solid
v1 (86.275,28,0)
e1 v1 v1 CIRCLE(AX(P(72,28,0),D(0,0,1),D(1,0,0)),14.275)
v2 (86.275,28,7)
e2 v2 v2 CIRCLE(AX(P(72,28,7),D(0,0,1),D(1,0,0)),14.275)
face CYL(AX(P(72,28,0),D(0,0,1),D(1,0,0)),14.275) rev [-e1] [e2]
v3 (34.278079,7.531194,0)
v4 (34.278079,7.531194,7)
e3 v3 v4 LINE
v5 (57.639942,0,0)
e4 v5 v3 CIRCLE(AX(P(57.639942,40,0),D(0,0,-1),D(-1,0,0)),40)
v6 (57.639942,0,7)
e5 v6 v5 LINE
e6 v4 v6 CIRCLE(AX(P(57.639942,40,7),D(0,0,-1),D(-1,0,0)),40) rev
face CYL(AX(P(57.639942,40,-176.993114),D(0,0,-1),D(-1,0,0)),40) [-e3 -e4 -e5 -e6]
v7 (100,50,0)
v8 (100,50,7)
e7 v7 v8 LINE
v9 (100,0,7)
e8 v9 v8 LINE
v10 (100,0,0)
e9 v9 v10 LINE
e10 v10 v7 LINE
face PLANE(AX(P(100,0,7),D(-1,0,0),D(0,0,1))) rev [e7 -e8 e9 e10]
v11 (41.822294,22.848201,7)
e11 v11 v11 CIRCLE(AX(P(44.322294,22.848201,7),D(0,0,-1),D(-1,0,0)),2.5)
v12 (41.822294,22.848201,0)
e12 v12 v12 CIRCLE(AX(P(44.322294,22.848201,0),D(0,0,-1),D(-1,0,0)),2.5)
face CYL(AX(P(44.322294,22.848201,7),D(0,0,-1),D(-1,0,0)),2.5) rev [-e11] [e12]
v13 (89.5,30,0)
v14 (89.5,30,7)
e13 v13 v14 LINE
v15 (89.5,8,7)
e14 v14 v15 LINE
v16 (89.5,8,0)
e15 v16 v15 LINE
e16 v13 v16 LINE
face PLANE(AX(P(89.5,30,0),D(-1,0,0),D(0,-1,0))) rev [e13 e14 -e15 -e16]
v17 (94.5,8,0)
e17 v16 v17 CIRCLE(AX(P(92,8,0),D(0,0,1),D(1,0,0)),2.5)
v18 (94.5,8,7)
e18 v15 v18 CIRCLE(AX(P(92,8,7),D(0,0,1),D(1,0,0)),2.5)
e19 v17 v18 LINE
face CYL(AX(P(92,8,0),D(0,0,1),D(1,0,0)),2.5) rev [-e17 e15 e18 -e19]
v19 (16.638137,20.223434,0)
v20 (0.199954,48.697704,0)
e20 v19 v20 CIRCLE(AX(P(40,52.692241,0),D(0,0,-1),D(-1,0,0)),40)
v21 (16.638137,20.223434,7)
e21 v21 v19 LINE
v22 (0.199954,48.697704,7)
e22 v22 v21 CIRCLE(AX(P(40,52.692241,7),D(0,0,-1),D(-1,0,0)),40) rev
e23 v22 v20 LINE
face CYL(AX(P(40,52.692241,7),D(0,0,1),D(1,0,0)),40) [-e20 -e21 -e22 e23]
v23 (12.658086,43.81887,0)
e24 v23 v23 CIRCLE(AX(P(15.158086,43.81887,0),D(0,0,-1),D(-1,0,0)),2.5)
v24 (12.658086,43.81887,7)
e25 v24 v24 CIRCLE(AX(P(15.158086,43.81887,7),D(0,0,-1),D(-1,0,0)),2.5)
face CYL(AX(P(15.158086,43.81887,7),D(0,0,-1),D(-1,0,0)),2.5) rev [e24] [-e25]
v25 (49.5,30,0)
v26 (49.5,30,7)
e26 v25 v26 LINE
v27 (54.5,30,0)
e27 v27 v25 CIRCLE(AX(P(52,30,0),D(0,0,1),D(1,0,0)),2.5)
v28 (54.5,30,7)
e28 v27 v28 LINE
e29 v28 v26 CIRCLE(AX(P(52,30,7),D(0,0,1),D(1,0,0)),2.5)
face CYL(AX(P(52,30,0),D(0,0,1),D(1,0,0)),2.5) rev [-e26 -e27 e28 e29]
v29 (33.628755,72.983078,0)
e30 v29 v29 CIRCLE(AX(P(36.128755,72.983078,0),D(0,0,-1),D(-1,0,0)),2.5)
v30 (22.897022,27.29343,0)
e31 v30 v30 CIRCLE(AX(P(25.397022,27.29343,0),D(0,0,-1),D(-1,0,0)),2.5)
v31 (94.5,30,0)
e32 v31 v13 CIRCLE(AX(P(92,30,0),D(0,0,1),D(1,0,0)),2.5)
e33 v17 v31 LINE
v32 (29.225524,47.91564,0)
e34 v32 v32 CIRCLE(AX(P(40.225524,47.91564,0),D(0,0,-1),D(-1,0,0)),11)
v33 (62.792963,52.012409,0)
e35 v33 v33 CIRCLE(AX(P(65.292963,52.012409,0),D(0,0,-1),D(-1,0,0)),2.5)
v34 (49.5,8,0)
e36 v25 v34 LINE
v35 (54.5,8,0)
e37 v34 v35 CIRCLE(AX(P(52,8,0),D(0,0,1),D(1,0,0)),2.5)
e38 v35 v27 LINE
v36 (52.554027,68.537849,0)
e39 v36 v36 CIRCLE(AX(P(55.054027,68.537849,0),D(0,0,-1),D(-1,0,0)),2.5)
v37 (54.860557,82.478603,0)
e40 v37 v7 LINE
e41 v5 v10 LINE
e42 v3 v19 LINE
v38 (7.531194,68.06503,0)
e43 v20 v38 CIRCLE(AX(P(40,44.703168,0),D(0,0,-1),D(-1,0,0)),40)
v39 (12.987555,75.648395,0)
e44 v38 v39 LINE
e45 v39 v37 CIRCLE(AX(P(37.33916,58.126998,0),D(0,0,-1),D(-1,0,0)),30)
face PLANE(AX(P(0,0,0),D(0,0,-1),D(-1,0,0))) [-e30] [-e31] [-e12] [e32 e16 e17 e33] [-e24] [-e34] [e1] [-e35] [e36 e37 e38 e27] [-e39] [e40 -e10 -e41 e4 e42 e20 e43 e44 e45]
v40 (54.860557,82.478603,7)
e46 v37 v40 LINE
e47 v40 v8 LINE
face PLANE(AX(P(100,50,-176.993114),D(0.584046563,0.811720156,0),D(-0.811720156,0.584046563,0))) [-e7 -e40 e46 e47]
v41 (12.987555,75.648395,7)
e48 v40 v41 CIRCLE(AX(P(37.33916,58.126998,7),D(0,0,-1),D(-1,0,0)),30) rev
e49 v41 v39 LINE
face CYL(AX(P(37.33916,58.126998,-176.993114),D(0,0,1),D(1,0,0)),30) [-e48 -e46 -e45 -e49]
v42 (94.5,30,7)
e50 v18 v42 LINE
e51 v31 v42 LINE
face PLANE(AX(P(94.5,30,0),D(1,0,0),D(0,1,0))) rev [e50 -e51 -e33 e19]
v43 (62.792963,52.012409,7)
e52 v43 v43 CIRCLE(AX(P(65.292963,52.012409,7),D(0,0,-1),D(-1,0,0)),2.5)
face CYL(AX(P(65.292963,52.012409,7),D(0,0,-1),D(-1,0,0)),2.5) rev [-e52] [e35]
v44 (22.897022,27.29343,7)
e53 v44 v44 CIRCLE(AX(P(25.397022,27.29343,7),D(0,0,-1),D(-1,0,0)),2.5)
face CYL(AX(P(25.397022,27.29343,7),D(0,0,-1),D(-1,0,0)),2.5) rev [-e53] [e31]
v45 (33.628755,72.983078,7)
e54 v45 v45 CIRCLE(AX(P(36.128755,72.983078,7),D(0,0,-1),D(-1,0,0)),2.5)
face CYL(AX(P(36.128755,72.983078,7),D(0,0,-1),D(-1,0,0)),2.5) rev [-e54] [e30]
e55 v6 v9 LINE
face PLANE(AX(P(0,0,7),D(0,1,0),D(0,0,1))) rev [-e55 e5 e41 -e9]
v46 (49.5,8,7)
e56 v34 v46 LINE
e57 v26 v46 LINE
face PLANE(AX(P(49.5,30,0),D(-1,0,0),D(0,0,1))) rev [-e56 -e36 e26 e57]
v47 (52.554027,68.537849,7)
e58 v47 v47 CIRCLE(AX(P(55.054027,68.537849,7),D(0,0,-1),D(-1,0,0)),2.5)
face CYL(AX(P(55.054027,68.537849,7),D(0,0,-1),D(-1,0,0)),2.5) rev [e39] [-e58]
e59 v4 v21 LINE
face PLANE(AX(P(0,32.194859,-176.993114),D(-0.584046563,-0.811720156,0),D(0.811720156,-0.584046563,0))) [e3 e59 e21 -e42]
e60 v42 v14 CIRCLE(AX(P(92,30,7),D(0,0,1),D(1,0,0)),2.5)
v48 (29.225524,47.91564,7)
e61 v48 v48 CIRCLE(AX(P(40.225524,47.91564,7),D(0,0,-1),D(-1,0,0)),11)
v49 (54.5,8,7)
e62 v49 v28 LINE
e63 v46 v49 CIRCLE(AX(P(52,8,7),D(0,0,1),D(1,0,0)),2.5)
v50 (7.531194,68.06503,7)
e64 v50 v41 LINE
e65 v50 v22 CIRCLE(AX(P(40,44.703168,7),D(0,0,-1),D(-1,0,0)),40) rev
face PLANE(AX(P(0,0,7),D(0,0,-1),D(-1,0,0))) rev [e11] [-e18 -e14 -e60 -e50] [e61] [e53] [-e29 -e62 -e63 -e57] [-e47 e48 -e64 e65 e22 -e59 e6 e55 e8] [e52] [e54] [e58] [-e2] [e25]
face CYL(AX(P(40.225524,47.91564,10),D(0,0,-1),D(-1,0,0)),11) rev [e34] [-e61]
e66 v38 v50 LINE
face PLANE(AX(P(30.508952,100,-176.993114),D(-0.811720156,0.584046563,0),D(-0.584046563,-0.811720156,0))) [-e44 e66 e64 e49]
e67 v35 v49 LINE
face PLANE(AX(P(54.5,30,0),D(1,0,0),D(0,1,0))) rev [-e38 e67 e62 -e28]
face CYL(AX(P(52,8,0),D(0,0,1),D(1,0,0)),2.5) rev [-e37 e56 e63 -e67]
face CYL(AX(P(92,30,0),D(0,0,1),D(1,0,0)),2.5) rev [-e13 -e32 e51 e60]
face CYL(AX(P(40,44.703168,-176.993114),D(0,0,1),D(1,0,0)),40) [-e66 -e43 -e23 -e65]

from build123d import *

# Parameters (mm, degrees)
SKETCH1_W               = 100
SKETCH1_H               = 100
BOSS_EXTRUDE1_DEPTH     = 7
SKETCH2_R               = 14.275
CUT_EXTRUDE1_DEPTH      = 142.594491418
SKETCH3_R               = 11
CUT_EXTRUDE2_DEPTH      = 10
SKETCH6_R               = 2.5
CUT_EXTRUDE3_DEPTH      = 142.594491418
CUT_EXTRUDE4_DEPTH      = 142.594491418
CUT_EXTRUDE4_DEPTH_BACK = 142.594491418
FILLET1_R               = 30
FILLET2_R               = 40


with BuildPart() as part:
    # Sketch1 → Boss-Extrude1 (new body)
    with BuildSketch(Plane.XY):
        with Locations((50, 50)):
            Rectangle(SKETCH1_W, SKETCH1_H)
    extrude(amount=BOSS_EXTRUDE1_DEPTH)

    # Sketch2 → Cut-Extrude1 (cut, through all)
    with BuildSketch(Plane.XY.offset(7)):
        with Locations((72, 28)):
            Circle(SKETCH2_R)
        with BuildLine():
            Line((54.5, 30), (54.5, 8))
            ThreePointArc((54.5, 8), (52, 5.5), (49.5, 8))
            Line((49.5, 8), (49.5, 30))
            ThreePointArc((49.5, 30), (52, 32.5), (54.5, 30))
        make_face()
        with BuildLine():
            Line((94.5, 30), (94.5, 8))
            ThreePointArc((94.5, 8), (92, 5.5), (89.5, 8))
            Line((89.5, 8), (89.5, 30))
            ThreePointArc((89.5, 30), (92, 32.5), (94.5, 30))
        make_face()
    extrude(amount=-CUT_EXTRUDE1_DEPTH, mode=Mode.SUBTRACT)

    # Sketch3 → Cut-Extrude2 (cut)
    with BuildSketch(Plane(origin=(0, 0, 0), x_dir=(-1, 0, 0), z_dir=(0, 0, -1))):
        with Locations((-40.225524413, 47.915639612)):
            Circle(SKETCH3_R)
    extrude(amount=-CUT_EXTRUDE2_DEPTH, mode=Mode.SUBTRACT)

    # Sketch6 → Cut-Extrude3 (cut, through all)
    with BuildSketch(Plane(origin=(0, 0, 0), x_dir=(-1, 0, 0), z_dir=(0, 0, -1))):
        with Locations((-15.158085821, 43.818869855)):
            Circle(SKETCH6_R)
        with Locations((-36.128754655, 72.983078204)):
            Circle(SKETCH6_R)
        with Locations((-25.397022274, 27.293430121)):
            Circle(SKETCH6_R)
        with Locations((-44.322294171, 22.848201021)):
            Circle(SKETCH6_R)
        with Locations((-55.054026552, 68.537849104)):
            Circle(SKETCH6_R)
        with Locations((-65.292963005, 52.01240937)):
            Circle(SKETCH6_R)
    extrude(amount=-CUT_EXTRUDE3_DEPTH, mode=Mode.SUBTRACT)

    # Sketch7 → Cut-Extrude4 (cut, two sides: drawn at the far end of the back side and taken through both)
    with BuildSketch(Plane(origin=(0, 0, 0), x_dir=(-1, 0, 0), z_dir=(0, 0, -1)).offset(-CUT_EXTRUDE4_DEPTH_BACK)):
        Polygon((-100, 100), (-100, 50), (-30.50895185, 100), align=None)
        Polygon((0, 100), (-30.50895185, 100), (0, 57.59801916), align=None)
        Polygon((0, 32.194859297), (-44.745090352, 0), (0, 0), align=None)
    extrude(amount=CUT_EXTRUDE4_DEPTH + CUT_EXTRUDE4_DEPTH_BACK, mode=Mode.SUBTRACT)

    # Fillet1
    fillet1_edges = [part.edges().sort_by_distance(p)[0] for p in [
        (30.50895185, 100, 3.5),
    ]]
    fillet(fillet1_edges, radius=FILLET1_R)

    # Fillet2
    # the kernel refuses this fillet: 40 mm, written as the material it takes off along each edge
    with BuildSketch(Plane(origin=(44.745090352, 0, 39.23712894), x_dir=(-0.8117201564538461, 0.5840465628753787, 0), z_dir=(0, 0, -1))) as fillet2_piece_1:
        with BuildLine():
            CenterArc((FILLET2_R * 0.322371289404, FILLET2_R), FILLET2_R, 234.264337428, 35.735662572)
            Line((-FILLET2_R * 0.261675273471, FILLET2_R * 0.188279843546), (0, 0))
            Line((0, 0), (FILLET2_R * 0.322371289404, 0))
        make_face()
    extrude(amount=71.474257881, mode=Mode.SUBTRACT)
    with BuildSketch(Plane(origin=(0, 32.194859297, -51.243453032), x_dir=(0, 1, 0), z_dir=(0, 0, 1))) as fillet2_piece_2:
        with BuildLine():
            CenterArc((FILLET2_R * 0.512434530321, -FILLET2_R), FILLET2_R, 90, 54.264337428)
            Line((-FILLET2_R * 0.299285626133, -FILLET2_R * 0.415953437125), (0, 0))
            Line((0, 0), (FILLET2_R * 0.512434530321, 0))
        make_face()
    extrude(amount=109.486906064, mode=Mode.SUBTRACT)
    with BuildSketch(Plane(origin=(0, 57.59801916, -32.23712894), x_dir=(0.5840465628753787, 0.8117201564538461, 0), z_dir=(0, 0, 1))) as fillet2_piece_3:
        with BuildLine():
            CenterArc((FILLET2_R * 0.322371289404, -FILLET2_R), FILLET2_R, 90, 35.735662572)
            Line((-FILLET2_R * 0.261675273471, -FILLET2_R * 0.188279843546), (0, 0))
            Line((0, 0), (FILLET2_R * 0.322371289404, 0))
        make_face()
    extrude(amount=71.474257881, mode=Mode.SUBTRACT)


solid = part.part
